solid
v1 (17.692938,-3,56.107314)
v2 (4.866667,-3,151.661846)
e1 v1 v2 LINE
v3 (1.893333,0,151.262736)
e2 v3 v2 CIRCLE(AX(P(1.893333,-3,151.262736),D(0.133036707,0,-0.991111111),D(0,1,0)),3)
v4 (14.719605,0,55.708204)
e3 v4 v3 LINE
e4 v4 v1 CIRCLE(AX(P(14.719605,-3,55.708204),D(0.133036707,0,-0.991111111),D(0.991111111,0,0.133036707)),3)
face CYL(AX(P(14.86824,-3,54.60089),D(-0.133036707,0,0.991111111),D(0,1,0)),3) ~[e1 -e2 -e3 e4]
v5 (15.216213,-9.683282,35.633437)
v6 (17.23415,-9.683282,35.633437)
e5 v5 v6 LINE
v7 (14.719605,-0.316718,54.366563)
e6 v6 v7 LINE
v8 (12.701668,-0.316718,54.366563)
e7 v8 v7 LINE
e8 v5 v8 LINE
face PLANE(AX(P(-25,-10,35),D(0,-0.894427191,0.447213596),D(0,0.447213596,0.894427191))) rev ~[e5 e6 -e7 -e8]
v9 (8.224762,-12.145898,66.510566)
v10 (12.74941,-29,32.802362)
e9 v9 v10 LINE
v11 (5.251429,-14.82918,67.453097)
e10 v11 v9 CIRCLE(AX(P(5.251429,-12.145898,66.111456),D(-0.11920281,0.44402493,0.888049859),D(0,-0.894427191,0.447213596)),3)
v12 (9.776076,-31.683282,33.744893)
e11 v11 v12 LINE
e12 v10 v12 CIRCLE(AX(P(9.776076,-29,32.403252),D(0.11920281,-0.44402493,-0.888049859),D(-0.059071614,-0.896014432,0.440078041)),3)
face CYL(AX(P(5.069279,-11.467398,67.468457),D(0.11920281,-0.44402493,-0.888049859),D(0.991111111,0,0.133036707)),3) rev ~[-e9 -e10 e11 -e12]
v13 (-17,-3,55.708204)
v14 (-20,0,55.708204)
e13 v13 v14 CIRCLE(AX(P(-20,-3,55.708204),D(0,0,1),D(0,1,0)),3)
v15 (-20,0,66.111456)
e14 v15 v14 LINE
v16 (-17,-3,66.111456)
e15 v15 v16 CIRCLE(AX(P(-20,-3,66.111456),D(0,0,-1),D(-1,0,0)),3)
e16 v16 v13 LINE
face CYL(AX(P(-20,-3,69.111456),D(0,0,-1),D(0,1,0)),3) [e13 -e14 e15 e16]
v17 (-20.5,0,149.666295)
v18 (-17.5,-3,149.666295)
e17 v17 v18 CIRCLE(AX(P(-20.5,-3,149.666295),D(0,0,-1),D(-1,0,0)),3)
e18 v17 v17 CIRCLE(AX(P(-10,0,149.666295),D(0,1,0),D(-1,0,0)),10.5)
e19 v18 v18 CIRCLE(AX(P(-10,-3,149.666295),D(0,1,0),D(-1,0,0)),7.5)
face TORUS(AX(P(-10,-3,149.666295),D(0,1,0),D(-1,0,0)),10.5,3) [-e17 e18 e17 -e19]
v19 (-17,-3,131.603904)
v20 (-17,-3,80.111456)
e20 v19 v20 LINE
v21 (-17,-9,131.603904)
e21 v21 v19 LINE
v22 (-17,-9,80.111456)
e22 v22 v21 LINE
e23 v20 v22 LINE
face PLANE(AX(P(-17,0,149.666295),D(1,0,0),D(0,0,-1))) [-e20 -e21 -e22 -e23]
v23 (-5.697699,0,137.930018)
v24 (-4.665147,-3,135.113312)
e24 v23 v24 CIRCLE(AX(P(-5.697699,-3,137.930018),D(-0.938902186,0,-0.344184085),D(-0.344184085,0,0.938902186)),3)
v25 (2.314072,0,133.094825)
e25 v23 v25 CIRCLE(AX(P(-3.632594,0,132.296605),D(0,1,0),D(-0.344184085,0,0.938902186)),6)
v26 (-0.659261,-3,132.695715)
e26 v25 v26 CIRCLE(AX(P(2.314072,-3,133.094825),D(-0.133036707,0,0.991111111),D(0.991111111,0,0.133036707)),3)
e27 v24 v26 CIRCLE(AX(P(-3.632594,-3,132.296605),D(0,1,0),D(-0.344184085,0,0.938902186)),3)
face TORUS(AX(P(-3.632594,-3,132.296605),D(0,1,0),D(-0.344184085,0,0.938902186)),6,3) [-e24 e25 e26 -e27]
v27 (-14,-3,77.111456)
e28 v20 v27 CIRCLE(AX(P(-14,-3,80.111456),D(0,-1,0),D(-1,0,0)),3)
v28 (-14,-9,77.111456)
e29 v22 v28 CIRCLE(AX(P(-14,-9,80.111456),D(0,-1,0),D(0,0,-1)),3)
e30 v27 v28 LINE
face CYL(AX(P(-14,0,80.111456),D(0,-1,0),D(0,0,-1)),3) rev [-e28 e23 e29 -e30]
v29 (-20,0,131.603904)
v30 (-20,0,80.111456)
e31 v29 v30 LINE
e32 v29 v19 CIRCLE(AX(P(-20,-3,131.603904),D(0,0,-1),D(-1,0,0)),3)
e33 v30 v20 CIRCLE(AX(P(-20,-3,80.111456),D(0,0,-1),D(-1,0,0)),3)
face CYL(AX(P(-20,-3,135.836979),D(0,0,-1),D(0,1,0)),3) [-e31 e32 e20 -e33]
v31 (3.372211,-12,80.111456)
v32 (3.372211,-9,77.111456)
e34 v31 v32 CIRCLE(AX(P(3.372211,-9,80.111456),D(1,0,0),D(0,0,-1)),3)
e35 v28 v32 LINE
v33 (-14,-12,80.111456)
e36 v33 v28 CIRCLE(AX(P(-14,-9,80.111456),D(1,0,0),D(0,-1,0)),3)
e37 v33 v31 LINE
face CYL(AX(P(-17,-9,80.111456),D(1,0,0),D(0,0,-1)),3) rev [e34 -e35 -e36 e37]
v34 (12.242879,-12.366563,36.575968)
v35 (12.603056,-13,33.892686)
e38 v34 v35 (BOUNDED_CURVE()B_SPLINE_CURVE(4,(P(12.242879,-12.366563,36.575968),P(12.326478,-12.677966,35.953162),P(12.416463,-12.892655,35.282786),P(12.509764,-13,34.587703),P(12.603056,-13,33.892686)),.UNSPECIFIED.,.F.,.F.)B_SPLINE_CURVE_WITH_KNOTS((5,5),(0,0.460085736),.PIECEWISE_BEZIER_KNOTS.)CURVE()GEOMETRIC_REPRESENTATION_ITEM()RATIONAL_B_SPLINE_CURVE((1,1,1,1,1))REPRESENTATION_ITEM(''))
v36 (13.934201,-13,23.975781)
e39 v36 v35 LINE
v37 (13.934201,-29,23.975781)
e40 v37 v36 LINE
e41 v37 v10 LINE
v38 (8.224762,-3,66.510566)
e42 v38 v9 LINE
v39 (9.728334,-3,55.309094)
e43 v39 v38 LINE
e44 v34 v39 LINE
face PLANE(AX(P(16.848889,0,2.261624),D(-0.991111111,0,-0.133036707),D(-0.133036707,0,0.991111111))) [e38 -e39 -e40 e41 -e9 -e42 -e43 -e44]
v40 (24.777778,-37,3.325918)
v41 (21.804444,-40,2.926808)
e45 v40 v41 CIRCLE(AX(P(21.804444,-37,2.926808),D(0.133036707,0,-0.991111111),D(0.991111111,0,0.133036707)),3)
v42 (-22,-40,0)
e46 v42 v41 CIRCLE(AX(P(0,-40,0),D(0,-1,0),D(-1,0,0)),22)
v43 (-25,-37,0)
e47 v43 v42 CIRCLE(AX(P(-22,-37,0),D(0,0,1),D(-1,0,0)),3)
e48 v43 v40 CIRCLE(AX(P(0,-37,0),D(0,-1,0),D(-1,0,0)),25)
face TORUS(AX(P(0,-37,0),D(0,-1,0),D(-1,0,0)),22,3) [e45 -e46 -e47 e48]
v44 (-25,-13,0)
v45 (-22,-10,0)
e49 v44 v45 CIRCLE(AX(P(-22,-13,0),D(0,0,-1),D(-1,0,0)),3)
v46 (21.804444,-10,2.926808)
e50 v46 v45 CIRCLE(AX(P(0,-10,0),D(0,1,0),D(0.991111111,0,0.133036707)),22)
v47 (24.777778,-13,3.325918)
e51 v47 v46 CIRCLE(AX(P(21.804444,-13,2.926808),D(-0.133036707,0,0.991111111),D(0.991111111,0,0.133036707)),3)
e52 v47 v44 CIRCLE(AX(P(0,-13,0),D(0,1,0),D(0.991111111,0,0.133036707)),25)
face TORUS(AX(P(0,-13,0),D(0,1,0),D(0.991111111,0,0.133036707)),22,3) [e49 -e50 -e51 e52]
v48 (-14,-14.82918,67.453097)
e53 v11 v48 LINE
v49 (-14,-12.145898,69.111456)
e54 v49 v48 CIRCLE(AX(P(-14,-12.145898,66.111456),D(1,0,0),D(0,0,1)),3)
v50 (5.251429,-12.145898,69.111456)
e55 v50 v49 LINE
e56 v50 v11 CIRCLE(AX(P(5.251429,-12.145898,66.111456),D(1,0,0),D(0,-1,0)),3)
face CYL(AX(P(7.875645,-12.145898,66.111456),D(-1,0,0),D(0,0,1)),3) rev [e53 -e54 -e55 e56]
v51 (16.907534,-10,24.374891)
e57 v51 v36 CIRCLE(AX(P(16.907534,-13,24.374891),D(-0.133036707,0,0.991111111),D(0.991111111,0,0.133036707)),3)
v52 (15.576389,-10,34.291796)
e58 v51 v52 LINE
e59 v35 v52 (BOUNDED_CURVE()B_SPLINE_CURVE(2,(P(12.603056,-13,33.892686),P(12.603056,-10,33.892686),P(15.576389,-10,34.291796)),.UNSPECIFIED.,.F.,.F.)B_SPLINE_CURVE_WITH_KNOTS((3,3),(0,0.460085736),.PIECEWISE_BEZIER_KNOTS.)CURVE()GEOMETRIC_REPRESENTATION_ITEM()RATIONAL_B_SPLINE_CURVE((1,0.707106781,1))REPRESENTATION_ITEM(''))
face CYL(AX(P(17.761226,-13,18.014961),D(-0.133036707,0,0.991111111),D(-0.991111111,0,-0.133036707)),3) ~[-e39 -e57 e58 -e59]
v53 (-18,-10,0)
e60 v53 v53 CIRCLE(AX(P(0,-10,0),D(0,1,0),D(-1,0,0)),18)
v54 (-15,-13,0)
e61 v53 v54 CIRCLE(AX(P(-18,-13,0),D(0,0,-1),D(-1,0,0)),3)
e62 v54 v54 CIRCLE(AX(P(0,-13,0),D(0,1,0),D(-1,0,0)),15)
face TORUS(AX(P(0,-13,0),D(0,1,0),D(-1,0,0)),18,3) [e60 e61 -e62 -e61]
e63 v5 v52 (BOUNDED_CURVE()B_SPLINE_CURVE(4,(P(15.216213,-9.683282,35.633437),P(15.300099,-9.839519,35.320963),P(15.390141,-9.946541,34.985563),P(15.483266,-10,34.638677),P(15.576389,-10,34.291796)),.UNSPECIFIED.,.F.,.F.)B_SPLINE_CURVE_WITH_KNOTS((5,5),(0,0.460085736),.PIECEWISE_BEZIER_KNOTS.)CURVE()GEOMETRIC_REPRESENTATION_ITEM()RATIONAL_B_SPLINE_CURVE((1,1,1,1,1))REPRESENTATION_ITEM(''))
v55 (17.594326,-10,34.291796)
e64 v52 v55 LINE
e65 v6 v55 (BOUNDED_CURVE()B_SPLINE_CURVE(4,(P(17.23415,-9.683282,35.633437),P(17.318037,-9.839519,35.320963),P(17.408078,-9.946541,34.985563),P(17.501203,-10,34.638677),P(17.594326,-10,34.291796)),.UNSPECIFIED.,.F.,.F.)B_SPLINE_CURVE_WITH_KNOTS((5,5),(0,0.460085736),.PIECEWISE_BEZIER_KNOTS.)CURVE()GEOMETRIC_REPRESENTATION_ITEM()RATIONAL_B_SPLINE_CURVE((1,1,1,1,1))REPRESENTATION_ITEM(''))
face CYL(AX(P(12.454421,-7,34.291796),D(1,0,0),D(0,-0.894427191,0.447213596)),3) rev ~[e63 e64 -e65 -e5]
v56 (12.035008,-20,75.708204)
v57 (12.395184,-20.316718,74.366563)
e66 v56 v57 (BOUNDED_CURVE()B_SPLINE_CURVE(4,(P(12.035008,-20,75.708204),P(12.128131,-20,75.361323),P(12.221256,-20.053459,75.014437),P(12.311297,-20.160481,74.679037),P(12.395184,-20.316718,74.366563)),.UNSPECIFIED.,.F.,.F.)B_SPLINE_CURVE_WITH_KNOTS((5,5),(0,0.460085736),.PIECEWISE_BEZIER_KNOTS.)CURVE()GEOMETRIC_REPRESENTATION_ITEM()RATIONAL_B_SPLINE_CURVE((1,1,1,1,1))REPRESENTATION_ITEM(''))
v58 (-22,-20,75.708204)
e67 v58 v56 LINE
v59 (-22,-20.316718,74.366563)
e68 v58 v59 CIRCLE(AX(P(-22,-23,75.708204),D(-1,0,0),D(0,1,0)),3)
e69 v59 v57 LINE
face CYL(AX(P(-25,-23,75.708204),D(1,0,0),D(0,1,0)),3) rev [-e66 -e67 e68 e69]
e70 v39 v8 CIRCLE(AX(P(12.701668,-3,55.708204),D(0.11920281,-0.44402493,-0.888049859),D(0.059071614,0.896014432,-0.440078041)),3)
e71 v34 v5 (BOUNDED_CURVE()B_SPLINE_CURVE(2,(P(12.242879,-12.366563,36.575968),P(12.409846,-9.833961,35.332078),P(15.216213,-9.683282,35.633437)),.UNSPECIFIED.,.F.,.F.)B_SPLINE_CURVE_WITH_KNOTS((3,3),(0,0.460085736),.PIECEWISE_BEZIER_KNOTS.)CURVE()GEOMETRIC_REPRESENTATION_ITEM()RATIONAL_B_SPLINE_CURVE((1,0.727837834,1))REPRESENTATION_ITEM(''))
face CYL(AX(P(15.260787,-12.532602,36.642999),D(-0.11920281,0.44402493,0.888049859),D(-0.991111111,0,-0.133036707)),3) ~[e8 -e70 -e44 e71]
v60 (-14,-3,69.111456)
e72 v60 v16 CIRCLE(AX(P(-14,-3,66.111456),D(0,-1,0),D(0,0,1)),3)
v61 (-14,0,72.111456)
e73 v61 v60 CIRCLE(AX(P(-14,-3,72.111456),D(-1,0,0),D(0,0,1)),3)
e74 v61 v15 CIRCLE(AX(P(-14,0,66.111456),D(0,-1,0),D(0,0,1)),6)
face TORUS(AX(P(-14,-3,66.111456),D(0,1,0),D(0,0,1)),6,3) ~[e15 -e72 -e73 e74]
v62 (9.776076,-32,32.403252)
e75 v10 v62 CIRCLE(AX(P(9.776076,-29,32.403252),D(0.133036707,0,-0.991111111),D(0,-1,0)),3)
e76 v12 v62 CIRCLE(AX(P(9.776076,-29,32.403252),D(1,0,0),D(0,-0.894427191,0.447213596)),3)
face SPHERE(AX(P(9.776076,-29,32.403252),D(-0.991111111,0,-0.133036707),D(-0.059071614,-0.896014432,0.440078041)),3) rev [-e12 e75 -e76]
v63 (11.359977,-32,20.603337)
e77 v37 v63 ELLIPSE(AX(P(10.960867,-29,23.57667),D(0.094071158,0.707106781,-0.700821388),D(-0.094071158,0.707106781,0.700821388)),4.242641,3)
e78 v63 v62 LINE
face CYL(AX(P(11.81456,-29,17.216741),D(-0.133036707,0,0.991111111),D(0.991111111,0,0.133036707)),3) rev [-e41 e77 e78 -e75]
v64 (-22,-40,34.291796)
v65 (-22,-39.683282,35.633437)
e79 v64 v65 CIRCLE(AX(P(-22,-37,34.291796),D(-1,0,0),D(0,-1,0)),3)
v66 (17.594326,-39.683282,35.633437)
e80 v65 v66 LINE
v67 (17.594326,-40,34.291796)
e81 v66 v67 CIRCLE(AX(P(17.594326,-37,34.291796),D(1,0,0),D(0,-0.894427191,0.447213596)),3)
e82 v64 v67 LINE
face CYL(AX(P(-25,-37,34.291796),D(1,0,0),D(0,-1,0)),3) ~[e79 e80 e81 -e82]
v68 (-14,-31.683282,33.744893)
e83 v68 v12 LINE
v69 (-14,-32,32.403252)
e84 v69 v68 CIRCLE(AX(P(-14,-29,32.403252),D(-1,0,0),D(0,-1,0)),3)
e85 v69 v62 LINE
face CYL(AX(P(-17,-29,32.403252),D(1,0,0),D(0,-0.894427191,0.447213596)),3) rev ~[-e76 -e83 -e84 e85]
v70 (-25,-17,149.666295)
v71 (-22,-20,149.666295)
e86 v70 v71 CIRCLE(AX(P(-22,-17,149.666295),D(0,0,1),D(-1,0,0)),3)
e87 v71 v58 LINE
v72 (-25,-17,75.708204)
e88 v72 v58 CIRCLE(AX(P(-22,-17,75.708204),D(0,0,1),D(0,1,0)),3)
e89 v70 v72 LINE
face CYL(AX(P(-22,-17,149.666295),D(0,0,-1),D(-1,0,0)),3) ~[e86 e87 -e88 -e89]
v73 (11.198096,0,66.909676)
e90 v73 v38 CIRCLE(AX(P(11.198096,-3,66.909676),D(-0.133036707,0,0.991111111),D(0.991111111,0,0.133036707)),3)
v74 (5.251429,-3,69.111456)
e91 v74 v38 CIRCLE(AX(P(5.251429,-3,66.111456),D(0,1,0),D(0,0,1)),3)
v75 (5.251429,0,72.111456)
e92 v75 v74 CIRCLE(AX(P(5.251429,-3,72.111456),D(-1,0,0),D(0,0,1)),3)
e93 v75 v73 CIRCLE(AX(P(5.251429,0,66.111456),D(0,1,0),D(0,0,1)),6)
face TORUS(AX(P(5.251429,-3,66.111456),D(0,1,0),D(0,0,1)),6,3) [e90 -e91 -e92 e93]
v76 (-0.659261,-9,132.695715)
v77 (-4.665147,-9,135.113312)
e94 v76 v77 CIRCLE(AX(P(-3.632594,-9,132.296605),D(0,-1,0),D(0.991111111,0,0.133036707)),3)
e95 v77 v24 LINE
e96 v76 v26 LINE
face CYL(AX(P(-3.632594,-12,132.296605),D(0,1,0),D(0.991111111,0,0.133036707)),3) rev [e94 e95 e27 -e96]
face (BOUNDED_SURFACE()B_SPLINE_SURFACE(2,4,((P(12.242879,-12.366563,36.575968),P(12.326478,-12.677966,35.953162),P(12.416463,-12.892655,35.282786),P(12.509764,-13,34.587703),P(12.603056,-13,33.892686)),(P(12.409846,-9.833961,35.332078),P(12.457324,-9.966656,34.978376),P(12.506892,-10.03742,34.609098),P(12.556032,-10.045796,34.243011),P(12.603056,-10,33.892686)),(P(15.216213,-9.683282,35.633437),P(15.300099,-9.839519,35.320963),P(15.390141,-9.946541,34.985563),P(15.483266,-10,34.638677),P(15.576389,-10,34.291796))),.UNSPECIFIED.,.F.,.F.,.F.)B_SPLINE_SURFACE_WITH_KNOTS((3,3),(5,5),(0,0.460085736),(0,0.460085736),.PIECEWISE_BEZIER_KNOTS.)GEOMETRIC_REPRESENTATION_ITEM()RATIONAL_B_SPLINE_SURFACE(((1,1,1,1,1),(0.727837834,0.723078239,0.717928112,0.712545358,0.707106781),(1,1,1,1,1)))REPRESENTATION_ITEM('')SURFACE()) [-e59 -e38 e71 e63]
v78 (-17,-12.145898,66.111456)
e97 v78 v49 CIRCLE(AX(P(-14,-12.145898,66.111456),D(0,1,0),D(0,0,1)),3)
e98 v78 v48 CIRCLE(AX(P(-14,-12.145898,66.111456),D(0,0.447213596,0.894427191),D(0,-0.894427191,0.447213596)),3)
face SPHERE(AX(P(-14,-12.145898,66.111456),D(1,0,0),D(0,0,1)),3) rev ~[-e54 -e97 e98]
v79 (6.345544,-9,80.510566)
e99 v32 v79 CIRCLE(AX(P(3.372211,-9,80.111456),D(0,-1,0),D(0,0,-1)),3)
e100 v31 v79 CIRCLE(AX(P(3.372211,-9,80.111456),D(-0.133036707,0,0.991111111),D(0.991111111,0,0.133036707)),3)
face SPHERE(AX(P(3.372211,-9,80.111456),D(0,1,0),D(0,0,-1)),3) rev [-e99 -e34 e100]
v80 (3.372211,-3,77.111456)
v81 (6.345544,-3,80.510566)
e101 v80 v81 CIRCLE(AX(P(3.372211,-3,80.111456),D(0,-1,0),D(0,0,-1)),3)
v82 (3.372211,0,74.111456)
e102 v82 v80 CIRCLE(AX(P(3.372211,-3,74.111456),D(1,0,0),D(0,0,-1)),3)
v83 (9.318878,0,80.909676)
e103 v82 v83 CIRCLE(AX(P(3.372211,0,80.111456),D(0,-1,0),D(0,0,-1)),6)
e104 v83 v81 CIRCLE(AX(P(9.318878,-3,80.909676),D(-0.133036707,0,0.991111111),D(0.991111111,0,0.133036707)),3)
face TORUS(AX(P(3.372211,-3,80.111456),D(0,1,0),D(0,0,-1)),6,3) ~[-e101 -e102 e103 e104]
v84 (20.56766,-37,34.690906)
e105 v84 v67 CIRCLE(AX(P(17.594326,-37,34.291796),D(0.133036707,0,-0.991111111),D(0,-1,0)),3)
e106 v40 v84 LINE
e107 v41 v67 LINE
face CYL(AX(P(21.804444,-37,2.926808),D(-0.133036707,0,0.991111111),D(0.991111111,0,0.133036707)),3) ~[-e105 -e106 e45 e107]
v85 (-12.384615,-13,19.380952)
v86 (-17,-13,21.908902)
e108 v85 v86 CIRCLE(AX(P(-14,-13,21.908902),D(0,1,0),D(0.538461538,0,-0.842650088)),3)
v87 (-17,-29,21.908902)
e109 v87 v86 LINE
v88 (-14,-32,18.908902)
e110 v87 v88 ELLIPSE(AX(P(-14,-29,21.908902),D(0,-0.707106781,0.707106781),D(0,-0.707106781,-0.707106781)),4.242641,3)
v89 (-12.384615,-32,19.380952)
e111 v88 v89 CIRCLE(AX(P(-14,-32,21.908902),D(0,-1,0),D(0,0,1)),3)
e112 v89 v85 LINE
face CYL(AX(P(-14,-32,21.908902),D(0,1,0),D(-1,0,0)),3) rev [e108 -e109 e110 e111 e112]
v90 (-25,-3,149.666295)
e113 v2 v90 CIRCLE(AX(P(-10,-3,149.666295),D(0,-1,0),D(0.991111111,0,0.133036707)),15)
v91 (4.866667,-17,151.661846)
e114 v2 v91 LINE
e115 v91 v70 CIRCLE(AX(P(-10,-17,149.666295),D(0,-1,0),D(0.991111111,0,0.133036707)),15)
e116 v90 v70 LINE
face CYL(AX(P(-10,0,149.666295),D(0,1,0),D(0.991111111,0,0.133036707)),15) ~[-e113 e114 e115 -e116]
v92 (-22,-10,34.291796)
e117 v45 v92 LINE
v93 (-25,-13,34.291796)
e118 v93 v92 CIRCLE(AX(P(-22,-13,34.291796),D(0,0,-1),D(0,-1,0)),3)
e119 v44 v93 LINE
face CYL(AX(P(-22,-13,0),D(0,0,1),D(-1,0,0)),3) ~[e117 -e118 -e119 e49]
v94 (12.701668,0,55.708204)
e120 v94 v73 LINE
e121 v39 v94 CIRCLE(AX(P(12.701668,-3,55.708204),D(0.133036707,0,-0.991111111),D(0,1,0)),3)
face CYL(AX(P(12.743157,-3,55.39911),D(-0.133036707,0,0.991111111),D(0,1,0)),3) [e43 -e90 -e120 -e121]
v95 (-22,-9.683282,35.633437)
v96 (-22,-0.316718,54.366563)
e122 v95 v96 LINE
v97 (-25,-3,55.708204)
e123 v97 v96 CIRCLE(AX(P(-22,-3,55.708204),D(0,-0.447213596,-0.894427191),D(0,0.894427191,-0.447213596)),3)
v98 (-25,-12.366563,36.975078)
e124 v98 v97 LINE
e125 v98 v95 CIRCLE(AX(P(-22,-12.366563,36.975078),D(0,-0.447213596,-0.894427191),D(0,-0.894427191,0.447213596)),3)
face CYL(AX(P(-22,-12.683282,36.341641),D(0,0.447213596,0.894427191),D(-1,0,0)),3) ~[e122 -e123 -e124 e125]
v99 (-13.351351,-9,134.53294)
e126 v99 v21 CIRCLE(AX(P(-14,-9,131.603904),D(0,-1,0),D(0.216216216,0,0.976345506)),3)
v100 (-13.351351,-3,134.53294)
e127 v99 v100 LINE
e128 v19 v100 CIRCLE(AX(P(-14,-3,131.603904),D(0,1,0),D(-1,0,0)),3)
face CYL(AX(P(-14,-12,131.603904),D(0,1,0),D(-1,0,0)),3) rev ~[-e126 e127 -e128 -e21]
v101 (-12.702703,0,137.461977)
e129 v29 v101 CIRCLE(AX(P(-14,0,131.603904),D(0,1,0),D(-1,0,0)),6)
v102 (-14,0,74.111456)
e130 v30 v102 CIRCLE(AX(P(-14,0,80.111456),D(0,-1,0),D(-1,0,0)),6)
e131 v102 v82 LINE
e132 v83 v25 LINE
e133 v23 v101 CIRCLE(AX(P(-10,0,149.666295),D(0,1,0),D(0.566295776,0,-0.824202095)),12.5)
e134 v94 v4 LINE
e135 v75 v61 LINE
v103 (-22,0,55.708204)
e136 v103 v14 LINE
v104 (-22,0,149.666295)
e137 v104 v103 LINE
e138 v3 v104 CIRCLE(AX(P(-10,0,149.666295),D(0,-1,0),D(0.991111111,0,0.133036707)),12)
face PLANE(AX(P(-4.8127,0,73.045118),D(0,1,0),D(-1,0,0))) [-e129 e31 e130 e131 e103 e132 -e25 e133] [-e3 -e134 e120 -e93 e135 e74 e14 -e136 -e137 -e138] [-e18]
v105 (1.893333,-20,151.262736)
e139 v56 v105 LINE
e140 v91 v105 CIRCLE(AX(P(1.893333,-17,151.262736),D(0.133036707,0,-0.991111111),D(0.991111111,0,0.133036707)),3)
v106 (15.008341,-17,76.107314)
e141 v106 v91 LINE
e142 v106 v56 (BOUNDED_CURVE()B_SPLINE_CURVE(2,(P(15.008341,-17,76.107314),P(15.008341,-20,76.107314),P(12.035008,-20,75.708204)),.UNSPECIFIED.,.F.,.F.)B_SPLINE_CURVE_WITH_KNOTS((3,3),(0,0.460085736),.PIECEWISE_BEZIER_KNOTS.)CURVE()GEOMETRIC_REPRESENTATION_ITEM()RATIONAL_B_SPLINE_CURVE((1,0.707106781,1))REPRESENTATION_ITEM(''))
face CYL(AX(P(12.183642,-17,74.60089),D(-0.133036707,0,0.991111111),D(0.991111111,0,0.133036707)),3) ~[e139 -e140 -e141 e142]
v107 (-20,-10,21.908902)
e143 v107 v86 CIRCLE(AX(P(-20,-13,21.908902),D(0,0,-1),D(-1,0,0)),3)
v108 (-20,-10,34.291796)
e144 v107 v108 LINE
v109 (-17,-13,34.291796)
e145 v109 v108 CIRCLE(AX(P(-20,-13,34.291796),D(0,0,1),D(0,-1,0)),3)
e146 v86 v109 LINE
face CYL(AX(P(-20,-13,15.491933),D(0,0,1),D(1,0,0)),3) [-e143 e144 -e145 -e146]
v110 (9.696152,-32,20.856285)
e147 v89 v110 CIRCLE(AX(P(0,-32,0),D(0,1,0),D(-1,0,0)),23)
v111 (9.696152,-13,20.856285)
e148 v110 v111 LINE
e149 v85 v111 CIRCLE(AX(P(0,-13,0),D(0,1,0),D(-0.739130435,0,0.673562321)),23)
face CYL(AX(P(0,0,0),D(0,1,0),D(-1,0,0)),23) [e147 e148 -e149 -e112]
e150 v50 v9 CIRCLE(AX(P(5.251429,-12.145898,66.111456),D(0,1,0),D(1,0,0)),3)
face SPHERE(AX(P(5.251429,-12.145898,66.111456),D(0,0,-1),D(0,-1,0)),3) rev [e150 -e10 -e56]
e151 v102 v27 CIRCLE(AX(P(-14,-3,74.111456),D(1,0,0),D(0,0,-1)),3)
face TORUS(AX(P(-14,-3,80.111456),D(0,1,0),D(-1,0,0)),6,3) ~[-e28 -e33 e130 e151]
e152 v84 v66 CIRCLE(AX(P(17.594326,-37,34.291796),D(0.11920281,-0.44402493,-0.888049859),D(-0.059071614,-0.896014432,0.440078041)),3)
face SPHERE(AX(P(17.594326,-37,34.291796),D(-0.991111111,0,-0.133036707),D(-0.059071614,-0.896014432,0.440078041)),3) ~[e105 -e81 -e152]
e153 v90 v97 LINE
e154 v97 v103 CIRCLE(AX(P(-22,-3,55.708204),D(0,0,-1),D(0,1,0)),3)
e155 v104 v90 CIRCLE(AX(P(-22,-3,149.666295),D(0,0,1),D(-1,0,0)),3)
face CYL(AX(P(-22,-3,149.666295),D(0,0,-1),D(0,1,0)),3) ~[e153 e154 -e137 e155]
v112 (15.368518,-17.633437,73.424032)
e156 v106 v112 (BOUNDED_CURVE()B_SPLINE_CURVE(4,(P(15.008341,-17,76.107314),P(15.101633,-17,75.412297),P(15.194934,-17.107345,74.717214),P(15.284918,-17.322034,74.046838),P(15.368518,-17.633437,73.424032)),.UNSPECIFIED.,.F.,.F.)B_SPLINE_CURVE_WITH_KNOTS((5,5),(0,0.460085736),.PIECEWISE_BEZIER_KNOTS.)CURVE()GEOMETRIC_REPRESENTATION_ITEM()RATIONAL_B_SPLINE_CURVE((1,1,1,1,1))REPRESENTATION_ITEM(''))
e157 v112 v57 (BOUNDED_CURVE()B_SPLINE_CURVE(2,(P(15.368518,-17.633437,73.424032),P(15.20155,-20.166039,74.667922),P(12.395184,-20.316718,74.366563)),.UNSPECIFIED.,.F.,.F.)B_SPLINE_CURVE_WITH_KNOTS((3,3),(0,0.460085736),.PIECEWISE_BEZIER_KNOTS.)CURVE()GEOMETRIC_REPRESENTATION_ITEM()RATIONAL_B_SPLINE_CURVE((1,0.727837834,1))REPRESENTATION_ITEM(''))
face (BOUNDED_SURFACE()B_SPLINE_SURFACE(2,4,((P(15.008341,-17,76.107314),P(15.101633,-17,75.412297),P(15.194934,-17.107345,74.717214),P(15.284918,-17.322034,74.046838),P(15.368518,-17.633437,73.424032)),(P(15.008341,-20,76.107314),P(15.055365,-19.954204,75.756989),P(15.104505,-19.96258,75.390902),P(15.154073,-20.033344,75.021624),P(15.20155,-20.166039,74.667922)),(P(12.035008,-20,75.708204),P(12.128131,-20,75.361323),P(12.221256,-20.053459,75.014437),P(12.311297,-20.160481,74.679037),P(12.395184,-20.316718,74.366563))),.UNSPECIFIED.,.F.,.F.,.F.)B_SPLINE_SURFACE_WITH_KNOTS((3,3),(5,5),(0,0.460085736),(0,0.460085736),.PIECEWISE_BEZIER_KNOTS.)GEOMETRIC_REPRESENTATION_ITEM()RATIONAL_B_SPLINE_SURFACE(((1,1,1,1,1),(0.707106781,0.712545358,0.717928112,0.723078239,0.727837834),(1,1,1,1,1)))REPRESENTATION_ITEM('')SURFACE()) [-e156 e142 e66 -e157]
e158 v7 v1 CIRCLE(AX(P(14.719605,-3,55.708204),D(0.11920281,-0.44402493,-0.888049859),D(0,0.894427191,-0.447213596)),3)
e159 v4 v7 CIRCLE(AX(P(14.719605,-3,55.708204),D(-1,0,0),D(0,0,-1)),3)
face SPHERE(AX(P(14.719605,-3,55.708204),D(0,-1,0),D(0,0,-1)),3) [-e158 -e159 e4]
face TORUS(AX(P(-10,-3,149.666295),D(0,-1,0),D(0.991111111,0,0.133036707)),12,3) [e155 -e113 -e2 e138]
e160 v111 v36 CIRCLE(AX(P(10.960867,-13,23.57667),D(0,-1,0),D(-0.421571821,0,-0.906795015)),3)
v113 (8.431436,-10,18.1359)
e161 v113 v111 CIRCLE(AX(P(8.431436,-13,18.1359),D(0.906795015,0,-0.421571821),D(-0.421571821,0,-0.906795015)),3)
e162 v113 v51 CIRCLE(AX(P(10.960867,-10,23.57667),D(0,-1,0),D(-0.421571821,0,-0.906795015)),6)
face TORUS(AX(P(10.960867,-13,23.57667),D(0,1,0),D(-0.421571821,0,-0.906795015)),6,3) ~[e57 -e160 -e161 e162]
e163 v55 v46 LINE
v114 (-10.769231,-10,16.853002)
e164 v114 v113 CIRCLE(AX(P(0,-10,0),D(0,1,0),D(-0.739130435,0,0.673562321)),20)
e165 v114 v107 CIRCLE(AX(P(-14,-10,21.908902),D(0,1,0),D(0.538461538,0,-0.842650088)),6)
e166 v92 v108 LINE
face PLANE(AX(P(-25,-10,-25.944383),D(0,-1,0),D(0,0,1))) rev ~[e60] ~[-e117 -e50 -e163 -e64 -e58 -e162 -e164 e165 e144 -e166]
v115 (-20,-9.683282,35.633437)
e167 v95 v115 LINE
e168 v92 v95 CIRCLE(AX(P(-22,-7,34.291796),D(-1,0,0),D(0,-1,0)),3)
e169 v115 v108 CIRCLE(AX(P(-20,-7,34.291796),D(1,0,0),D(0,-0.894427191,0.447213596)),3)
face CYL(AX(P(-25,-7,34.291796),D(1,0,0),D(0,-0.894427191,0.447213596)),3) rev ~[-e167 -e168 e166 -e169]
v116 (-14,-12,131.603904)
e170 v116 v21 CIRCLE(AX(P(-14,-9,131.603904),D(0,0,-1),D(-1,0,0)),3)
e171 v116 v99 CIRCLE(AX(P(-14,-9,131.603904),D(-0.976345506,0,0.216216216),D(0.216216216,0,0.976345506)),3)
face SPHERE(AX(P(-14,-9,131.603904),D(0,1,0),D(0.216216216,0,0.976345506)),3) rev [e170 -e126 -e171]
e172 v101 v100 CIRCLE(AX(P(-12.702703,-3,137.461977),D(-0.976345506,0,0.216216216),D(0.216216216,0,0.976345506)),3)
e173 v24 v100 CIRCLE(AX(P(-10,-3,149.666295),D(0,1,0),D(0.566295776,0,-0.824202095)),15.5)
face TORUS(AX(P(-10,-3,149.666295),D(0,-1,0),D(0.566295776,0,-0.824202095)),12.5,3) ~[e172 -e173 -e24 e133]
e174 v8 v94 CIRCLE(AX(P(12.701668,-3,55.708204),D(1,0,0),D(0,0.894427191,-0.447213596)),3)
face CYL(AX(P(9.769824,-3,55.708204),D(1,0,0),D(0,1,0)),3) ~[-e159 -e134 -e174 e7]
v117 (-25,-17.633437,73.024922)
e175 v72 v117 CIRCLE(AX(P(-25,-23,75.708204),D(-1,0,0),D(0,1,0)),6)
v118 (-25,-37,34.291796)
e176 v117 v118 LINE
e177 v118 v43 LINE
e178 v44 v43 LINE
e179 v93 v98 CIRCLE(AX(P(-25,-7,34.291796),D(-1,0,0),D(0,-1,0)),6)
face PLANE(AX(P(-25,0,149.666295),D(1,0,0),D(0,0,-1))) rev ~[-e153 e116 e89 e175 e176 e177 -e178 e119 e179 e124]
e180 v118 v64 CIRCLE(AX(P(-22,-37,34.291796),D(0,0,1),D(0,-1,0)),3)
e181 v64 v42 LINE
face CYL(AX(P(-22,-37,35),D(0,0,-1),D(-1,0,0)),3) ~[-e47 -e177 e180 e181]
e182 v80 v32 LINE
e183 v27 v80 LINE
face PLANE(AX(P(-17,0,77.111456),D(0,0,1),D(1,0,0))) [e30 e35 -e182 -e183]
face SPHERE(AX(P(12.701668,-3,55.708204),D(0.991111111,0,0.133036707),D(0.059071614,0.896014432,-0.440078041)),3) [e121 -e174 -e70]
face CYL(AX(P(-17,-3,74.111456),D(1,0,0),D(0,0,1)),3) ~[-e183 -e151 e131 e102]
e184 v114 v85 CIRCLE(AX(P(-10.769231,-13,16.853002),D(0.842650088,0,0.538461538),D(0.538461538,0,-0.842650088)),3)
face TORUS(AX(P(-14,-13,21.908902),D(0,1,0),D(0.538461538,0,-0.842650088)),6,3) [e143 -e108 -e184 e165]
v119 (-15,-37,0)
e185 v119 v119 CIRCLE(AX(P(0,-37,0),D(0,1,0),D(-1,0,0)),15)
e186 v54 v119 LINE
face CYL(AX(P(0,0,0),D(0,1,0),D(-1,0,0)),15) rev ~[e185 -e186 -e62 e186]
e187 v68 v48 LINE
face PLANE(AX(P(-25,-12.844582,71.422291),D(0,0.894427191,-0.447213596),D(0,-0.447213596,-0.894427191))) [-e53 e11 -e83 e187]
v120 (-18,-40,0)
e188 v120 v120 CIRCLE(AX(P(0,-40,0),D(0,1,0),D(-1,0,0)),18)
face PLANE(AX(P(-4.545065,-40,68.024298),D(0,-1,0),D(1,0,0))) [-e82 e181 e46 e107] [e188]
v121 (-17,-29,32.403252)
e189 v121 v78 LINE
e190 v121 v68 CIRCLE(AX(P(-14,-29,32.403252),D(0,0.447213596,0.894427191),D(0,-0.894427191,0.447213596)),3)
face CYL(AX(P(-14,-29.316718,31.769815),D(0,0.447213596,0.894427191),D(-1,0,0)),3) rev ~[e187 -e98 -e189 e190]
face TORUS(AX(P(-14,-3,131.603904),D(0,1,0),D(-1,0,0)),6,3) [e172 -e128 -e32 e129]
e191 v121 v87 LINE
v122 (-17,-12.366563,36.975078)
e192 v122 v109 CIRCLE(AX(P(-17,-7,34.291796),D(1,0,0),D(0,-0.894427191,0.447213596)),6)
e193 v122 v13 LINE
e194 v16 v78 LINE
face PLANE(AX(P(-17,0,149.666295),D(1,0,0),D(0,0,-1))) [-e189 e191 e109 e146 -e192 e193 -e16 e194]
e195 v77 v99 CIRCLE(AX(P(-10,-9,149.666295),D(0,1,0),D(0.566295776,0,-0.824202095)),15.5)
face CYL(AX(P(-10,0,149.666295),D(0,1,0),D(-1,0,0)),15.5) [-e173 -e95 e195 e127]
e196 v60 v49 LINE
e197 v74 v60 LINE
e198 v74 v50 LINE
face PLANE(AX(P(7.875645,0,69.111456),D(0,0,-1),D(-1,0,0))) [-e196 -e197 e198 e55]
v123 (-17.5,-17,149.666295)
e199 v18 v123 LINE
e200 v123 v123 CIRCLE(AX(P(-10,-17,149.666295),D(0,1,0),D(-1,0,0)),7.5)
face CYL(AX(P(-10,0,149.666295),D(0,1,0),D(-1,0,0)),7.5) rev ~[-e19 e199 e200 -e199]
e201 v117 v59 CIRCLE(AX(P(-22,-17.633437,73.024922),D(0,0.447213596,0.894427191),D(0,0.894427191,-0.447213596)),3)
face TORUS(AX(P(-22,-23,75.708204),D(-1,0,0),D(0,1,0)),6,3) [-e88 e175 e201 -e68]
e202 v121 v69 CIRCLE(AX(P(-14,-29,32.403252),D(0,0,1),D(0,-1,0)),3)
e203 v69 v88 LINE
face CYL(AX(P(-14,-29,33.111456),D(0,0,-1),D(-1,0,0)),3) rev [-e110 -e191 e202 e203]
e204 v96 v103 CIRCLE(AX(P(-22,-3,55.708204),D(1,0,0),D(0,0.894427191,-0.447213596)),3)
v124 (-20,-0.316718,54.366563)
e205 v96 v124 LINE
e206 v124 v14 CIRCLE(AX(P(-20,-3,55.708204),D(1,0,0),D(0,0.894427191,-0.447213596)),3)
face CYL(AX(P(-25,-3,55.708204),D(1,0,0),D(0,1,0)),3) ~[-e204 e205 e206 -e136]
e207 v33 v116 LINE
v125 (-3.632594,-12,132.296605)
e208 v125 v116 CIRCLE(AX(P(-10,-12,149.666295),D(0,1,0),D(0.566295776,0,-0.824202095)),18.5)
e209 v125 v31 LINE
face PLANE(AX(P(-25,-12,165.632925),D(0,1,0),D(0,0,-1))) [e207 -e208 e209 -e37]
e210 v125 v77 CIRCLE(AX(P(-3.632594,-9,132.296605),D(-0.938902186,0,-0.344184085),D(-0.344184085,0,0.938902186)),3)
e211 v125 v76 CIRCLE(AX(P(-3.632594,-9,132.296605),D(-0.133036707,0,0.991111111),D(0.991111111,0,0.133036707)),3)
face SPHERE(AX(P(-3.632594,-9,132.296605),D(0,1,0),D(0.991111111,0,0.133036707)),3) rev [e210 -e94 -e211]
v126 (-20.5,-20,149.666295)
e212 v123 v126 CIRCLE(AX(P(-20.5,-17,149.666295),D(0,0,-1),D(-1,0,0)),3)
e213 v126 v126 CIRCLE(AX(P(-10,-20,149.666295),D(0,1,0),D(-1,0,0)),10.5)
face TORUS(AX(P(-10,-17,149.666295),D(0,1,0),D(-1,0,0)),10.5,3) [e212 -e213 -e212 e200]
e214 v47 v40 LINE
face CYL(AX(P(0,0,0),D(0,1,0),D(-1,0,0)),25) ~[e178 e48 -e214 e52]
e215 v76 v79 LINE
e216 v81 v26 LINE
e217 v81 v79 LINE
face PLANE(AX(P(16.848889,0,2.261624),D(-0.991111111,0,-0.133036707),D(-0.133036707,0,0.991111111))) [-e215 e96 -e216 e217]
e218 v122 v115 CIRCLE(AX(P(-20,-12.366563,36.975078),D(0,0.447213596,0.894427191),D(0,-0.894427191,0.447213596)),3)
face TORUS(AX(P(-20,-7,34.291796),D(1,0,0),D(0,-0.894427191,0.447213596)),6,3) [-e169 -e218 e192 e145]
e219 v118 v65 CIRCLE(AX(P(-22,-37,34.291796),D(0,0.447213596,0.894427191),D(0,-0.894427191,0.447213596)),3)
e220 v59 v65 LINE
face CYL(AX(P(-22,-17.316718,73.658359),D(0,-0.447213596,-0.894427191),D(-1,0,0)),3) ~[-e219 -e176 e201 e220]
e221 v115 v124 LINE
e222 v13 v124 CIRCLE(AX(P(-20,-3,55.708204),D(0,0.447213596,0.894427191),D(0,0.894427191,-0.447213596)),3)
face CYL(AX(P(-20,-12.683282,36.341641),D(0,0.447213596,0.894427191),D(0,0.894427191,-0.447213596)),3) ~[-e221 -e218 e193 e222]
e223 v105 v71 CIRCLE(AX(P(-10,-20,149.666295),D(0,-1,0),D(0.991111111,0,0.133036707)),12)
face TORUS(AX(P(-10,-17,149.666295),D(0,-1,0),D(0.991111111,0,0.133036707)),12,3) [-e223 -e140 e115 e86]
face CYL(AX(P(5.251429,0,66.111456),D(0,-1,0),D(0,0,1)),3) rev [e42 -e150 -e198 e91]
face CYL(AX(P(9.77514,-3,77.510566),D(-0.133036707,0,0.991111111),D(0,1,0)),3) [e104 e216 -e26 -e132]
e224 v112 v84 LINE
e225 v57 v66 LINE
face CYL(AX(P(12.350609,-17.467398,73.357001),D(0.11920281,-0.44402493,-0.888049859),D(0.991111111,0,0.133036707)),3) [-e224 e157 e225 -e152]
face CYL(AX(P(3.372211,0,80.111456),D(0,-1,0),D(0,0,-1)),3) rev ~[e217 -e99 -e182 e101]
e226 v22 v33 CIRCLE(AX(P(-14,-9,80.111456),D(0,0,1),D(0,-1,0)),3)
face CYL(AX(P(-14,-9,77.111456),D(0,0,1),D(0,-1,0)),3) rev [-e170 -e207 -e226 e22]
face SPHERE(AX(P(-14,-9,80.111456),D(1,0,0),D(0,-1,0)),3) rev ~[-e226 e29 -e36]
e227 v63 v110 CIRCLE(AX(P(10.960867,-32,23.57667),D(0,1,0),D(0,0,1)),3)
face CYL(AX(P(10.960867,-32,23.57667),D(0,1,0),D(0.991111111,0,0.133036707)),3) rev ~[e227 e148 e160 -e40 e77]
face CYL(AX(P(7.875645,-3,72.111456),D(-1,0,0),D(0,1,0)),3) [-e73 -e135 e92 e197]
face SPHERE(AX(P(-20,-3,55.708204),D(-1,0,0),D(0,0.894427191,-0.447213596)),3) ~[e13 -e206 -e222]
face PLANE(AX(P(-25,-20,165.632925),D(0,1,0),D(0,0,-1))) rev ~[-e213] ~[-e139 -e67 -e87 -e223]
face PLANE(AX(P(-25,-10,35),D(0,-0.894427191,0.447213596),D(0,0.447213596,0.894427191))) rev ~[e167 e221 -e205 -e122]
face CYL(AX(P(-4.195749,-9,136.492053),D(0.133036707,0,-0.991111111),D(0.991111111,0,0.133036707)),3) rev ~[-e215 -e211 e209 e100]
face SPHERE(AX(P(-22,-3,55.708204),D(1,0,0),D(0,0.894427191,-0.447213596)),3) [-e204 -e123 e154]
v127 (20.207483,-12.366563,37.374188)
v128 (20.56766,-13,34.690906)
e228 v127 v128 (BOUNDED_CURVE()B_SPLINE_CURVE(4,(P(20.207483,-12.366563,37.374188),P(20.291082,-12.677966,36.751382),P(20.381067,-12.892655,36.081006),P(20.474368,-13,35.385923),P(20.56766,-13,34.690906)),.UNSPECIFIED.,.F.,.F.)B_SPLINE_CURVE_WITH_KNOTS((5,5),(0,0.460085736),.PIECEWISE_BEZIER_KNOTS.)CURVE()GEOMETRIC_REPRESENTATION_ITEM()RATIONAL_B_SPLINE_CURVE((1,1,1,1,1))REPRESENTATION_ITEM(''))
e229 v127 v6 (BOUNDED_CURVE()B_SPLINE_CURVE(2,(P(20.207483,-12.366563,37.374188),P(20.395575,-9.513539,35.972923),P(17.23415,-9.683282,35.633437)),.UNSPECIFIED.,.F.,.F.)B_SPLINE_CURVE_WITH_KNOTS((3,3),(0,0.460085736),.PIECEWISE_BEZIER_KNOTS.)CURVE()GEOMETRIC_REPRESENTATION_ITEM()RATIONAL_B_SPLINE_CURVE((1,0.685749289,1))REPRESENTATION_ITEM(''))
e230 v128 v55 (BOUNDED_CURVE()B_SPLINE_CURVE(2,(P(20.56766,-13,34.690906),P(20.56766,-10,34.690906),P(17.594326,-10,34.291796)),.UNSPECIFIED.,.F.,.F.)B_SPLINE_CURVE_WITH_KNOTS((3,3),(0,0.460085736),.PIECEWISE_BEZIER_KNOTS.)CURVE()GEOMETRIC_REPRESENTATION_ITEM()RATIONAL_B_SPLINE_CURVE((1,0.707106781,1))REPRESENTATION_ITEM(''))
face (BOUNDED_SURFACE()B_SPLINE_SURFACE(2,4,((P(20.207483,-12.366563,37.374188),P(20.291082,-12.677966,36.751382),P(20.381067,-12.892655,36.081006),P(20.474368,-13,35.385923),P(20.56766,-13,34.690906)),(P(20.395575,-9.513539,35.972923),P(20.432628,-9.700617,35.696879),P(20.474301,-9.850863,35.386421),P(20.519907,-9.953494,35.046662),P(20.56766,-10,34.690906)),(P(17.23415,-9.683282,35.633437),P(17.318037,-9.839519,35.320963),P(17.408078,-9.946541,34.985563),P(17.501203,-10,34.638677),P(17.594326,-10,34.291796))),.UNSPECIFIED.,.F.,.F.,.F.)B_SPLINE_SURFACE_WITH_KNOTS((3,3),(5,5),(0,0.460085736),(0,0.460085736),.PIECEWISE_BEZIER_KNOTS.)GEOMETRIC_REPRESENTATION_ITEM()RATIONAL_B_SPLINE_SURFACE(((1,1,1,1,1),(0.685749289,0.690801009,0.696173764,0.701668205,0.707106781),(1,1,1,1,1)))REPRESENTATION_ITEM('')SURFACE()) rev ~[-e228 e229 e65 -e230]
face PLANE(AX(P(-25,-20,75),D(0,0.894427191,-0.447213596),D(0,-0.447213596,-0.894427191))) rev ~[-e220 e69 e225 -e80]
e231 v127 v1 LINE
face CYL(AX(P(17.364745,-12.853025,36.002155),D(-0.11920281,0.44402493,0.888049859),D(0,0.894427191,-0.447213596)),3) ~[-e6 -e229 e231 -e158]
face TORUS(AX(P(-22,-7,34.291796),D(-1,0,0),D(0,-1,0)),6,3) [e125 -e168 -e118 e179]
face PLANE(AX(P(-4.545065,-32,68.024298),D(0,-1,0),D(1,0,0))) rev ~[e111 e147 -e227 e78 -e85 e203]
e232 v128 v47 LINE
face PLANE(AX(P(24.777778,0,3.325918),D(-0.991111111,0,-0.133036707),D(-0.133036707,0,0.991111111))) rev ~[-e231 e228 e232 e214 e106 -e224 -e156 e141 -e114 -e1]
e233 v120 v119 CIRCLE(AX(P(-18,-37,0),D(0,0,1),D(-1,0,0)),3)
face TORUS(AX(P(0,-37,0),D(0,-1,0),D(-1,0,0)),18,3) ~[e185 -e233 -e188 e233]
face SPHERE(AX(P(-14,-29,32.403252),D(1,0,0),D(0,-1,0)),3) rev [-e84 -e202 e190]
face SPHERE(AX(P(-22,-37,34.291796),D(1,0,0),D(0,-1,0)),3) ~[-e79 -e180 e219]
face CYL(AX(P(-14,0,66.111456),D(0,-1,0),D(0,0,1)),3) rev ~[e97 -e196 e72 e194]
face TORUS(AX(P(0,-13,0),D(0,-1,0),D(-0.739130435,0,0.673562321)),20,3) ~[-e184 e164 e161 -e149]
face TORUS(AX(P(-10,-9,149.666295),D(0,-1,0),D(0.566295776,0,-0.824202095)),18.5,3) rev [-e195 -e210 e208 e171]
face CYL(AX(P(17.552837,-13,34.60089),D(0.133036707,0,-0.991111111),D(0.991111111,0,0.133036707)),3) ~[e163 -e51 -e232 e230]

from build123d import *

# Parameters (mm, degrees)
F1_DEPTH = 40
F2_W     = 20
F2_H     = 15.9666295471
F2_W_2   = 10
F2_H_2   = 25.9443825785
F3_DEPTH = 50.001
F4_R     = 7.5
F4_R_2   = 15
F5_DEPTH = 40.001
F6_T     = -8
F8_DEPTH = 14
F9_R     = 3


with BuildPart() as f1:
    # F0 (on Front) → F1 (new body)
    with BuildSketch(Plane.XZ):
        with BuildLine():
            Line((-25, 149.666295471), (-25, 0))
            ThreePointArc((-25, 0), (1.6666666667, -24.9443825785), (24.7777777778, 3.3259176771))
            Line((24.7777777778, 3.3259176771), (4.8666666667, 151.6618460772))
            ThreePointArc((4.8666666667, 151.6618460772), (-11, 164.6329250181), (-25, 149.666295471))
        make_face()
    extrude(amount=F1_DEPTH)

    # F2 (on face) → F3 (cut, through all)
    with BuildSketch(Plane(origin=(-25, 0, 0), x_dir=(0, -1, 0), z_dir=(-1, 0, 0))):
        Polygon((40, 149.666295471), (20, 149.666295471), (20, 75), (40, 35), align=None)
        with Locations((30, 157.6496102445)):
            Rectangle(F2_W, F2_H)
        Polygon((0, 55), (0, 0), (10, 0), (10, 35), align=None)
        with Locations((5, -12.9721912892)):
            Rectangle(F2_W_2, F2_H_2)
    extrude(amount=-F3_DEPTH, mode=Mode.SUBTRACT)

    # F4 (on face) → F5 (cut, through all)
    with BuildSketch(Plane(origin=(0, 0, 0), x_dir=(-1, 0, 0), z_dir=(0, 1, 0))):
        with Locations((10, 149.666295471)):
            Circle(F4_R)
        Circle(F4_R_2)
    extrude(amount=-F5_DEPTH, mode=Mode.SUBTRACT)

    # F6
    f6_openings = [f1.faces().sort_by_distance(p)[0] for p in [
        (-6.738157, 0, 102.644086),
        (-2.901268, -5.050633, 44.898734),
        (-24.218975, -10, 17.5),
    ]]
    offset(amount=F6_T, openings=f6_openings)

    # F7 (on face) → F8 (join, through all)
    with BuildSketch(Plane(origin=(0, 0, 0), x_dir=(-1, 0, 0), z_dir=(0, 1, 0))):
        Polygon((17, 77.11145618), (-6.8018062916, 77.11145618), (-7.8756451829, 69.11145618), (17, 69.11145618), align=None)
    extrude(amount=-F8_DEPTH)

    # F9
    f9_edges = [f1.edges().sort_by_distance(p)[0] for p in [
        (-21, 0, 55),
        (-25, -5, 45),
        (-21, -10, 35),
        (-17, -5, 45),
        (16.490296, -10, 35),
        (19.183871, -5, 45),
        (13.805698, 0, 55),
        (11.112123, -5, 45),
        (-17, -23, 51.111456),
        (-2.14604, -32, 33.111456),
        (10.291783, -23, 51.111456),
        (-4.562177, -14, 69.111456),
        (-17, 0, 62.055728),
        (-17, -10, 25.245967),
        (-17, -21, 15.491933),
        (-17, -32, 24.301695),
        (-17, -7, 69.111456),
        (13.621157, -10, 26.307926),
        (8.822735, 0, 62.055728),
        (7.875645, -7, 69.111456),
        (13.747907, -32, 25.363654),
        (14.787893, -21, 17.615851),
        (-25, -10, 17.5),
        (1.666667, -10, -24.944383),
        (22.651974, -10, 19.162959),
        (-1.533333, -10, 22.948832),
        (15, -10, 0),
        (-25, -30, 55),
        (-2.236915, -40, 35),
        (17.841573, -30, 55),
        (-4.921512, -20, 75),
        (-25, -40, 17.5),
        (22.651974, -40, 19.162959),
        (1.666667, -40, -24.944383),
        (15, -40, 0),
        (2.789695, 0, 107.00131),
        (-1.222415, -6, 136.891163),
        (2.789695, -12, 107.00131),
        (6.801806, -6, 77.111456),
        (-25, -20, 112.333148),
        (-11, -20, 164.632925),
        (10.011821, -20, 113.330923),
        (-2.5, -20, 149.666295),
        (-2.5, 0, 149.666295),
        (-17.5, -10, 149.666295),
        (-5.099097, -12, 77.111456),
        (-8.966667, -12, 134.200778),
        (-17, -12, 106.474217),
        (-8.966667, 0, 134.200778),
        (-17, -6, 135.836979),
        (-5.099097, 0, 77.111456),
        (11.35412, 0, 103.330923),
        (4.866667, -10, 151.661846),
        (24.777778, -25, 3.325918),
        (-25, 0, 102.333148),
        (-4.562177, 0, 69.111456),
        (-11, 0, 164.632925),
        (-17, -6, 77.111456),
        (-17, 0, 106.474217),
    ]]
    fillet(f9_edges, radius=F9_R)


solid = f1.part
